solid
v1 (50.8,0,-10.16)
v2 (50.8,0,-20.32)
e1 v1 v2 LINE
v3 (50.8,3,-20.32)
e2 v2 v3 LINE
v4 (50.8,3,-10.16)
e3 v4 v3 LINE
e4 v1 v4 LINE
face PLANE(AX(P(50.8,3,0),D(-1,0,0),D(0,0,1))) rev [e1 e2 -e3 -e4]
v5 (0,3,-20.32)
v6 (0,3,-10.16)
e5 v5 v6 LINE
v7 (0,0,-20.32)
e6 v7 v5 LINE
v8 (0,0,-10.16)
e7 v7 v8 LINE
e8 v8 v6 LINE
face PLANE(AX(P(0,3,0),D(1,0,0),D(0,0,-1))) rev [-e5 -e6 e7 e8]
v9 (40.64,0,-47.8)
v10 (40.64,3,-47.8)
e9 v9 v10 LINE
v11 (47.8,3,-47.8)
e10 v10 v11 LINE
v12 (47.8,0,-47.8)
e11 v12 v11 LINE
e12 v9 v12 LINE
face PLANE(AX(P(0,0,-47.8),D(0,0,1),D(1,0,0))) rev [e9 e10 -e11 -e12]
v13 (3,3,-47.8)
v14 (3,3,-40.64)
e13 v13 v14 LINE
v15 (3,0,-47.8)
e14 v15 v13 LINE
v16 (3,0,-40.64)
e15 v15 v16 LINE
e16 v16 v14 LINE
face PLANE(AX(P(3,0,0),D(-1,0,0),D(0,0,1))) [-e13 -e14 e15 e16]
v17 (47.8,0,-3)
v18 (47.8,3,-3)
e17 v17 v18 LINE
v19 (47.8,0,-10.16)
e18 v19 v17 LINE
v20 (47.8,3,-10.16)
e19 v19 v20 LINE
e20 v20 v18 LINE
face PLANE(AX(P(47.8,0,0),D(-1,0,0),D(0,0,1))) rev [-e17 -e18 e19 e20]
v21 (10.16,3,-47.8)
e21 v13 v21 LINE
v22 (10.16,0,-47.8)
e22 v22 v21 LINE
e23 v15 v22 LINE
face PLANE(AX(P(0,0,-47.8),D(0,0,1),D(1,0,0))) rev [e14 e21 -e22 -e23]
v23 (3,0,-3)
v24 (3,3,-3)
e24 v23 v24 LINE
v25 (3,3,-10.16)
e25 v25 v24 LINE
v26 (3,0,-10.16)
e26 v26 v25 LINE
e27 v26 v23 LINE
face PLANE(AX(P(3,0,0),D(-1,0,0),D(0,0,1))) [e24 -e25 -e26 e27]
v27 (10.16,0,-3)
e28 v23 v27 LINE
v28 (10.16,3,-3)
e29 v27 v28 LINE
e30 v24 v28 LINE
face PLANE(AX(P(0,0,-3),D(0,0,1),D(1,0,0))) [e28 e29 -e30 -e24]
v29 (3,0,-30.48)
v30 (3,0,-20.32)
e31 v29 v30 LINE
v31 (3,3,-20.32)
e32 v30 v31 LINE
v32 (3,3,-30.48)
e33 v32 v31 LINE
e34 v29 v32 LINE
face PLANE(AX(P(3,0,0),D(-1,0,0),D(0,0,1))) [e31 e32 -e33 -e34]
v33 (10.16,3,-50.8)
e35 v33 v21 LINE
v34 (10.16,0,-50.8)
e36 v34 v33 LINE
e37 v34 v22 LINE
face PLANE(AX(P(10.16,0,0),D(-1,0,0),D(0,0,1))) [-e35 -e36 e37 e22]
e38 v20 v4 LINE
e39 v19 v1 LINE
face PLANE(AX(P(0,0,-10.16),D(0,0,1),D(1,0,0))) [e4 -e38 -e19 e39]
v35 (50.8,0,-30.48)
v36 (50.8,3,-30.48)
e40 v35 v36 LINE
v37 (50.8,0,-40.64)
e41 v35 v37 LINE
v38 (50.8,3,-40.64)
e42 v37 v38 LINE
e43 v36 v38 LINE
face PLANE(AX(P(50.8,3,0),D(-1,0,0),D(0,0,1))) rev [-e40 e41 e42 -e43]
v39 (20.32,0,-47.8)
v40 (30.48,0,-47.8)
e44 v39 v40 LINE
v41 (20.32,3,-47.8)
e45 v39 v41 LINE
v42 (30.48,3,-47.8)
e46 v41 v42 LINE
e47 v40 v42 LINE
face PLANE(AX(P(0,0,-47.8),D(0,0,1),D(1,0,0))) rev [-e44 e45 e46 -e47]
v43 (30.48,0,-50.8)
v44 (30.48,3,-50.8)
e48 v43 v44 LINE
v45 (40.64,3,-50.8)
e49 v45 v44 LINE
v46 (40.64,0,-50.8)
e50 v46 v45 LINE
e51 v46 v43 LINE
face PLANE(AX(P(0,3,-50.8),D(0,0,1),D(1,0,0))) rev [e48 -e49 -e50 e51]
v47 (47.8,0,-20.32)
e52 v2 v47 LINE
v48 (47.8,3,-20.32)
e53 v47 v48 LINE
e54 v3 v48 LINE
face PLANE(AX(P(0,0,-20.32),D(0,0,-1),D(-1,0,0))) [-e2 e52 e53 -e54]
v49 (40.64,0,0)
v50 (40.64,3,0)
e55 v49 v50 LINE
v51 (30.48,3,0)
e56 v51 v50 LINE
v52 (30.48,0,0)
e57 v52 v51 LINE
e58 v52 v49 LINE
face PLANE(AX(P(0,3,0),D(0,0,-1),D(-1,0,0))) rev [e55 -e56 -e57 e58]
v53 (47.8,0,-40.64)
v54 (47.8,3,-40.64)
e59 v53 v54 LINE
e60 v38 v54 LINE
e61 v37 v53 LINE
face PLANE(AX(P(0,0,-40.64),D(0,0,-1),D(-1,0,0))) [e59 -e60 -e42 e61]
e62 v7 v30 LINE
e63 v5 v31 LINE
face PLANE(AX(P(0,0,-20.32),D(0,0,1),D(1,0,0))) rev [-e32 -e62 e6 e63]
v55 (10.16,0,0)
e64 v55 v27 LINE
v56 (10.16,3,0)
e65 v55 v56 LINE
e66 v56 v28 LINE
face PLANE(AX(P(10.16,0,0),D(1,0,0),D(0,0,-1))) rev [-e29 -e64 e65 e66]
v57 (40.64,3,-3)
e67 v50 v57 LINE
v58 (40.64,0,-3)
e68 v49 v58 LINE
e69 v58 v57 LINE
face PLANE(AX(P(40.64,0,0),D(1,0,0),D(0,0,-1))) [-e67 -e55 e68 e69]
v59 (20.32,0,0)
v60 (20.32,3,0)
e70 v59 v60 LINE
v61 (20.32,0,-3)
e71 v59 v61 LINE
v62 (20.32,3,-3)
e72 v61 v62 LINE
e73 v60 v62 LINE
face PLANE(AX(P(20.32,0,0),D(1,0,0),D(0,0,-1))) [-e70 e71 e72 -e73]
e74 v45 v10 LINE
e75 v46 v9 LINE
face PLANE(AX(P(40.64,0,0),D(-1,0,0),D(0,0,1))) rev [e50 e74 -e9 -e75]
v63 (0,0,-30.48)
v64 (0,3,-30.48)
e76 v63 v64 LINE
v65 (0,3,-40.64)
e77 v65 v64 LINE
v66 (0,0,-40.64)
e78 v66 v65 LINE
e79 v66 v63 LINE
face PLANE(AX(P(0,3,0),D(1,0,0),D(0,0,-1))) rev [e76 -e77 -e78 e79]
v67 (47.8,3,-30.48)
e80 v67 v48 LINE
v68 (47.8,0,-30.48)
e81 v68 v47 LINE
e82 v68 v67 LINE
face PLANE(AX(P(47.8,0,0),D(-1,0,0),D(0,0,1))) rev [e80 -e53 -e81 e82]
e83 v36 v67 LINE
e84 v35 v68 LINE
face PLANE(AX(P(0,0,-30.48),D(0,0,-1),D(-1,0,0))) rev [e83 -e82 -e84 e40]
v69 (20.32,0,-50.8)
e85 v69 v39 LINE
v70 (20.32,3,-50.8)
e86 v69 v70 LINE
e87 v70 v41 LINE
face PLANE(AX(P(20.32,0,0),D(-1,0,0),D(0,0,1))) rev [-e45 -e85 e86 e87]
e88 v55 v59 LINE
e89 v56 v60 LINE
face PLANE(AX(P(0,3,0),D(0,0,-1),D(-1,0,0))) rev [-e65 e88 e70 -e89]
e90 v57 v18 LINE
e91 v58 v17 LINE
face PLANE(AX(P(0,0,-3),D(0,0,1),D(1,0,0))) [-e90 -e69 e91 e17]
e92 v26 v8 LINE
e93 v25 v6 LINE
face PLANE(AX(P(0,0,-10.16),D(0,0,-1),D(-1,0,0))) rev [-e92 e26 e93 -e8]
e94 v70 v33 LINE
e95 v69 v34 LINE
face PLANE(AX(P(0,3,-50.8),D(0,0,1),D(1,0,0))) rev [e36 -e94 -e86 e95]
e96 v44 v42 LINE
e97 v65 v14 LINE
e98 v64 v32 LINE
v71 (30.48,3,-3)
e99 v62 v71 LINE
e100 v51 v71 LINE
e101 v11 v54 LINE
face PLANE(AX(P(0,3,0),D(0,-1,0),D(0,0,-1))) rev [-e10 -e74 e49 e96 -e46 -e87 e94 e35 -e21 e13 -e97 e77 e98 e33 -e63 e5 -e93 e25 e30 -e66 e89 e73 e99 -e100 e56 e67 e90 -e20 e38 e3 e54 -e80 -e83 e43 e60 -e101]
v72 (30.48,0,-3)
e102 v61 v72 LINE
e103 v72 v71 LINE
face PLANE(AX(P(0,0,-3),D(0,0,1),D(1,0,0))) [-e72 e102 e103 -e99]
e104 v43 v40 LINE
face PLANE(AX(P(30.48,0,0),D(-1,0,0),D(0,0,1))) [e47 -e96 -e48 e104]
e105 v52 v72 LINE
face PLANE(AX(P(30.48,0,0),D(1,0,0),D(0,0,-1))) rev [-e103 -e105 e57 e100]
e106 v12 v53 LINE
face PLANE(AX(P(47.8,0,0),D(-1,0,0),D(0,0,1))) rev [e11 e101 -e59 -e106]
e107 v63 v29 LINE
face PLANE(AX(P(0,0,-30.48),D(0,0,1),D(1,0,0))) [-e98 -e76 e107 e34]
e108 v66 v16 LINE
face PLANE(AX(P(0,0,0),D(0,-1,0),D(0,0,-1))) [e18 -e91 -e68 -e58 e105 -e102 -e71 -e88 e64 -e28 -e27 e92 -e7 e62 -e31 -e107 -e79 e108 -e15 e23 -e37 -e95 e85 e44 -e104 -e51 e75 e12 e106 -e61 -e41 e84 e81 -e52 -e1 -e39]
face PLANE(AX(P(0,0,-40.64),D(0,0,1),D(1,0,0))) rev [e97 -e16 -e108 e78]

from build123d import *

# Parameters (mm, degrees)
SKETCH1_W           = 50.8
SKETCH1_H           = 50.8
BOSS_EXTRUDE1_DEPTH = 3
SKETCH2_W           = 10.16
SKETCH2_H           = 3
SKETCH2_W_2         = 3
SKETCH2_H_2         = 10.16
CUT_EXTRUDE1_DEPTH  = 72.904659098


with BuildPart() as part:
    # Sketch1 → Boss-Extrude1 (new body)
    with BuildSketch(Plane(origin=(0, 0, 0), x_dir=(1, 0, 0), z_dir=(0, 1, 0))):
        with Locations((25.4, 25.4)):
            Rectangle(SKETCH1_W, SKETCH1_H)
    extrude(amount=BOSS_EXTRUDE1_DEPTH)

    # Sketch2 → Cut-Extrude1 (cut, through all)
    with BuildSketch(Plane(origin=(0, 3, 0), x_dir=(1, 0, 0), z_dir=(0, 1, 0))):
        Polygon((50.8, 50.8), (40.64, 50.8), (40.64, 47.8), (47.8, 47.8), (47.8, 40.64), (50.8, 40.64), align=None)
        with Locations((25.4, 49.3)):
            Rectangle(SKETCH2_W, SKETCH2_H)
        Polygon((10.16, 47.8), (10.16, 50.8), (0, 50.8), (0, 40.64), (3, 40.64), (3, 47.8), align=None)
        with Locations((49.3, 25.4)):
            Rectangle(SKETCH2_W_2, SKETCH2_H_2)
        Polygon((50.8, 10.16), (47.8, 10.16), (47.8, 3), (40.64, 3), (40.64, 0), (50.8, 0), align=None)
        with Locations((1.5, 25.4)):
            Rectangle(SKETCH2_W_2, SKETCH2_H_2)
        Polygon((3, 10.16), (0, 10.16), (0, 0), (10.16, 0), (10.16, 3), (3, 3), align=None)
        with Locations((25.4, 1.5)):
            Rectangle(SKETCH2_W, SKETCH2_H)
    extrude(amount=-CUT_EXTRUDE1_DEPTH, mode=Mode.SUBTRACT)


solid = part.part
